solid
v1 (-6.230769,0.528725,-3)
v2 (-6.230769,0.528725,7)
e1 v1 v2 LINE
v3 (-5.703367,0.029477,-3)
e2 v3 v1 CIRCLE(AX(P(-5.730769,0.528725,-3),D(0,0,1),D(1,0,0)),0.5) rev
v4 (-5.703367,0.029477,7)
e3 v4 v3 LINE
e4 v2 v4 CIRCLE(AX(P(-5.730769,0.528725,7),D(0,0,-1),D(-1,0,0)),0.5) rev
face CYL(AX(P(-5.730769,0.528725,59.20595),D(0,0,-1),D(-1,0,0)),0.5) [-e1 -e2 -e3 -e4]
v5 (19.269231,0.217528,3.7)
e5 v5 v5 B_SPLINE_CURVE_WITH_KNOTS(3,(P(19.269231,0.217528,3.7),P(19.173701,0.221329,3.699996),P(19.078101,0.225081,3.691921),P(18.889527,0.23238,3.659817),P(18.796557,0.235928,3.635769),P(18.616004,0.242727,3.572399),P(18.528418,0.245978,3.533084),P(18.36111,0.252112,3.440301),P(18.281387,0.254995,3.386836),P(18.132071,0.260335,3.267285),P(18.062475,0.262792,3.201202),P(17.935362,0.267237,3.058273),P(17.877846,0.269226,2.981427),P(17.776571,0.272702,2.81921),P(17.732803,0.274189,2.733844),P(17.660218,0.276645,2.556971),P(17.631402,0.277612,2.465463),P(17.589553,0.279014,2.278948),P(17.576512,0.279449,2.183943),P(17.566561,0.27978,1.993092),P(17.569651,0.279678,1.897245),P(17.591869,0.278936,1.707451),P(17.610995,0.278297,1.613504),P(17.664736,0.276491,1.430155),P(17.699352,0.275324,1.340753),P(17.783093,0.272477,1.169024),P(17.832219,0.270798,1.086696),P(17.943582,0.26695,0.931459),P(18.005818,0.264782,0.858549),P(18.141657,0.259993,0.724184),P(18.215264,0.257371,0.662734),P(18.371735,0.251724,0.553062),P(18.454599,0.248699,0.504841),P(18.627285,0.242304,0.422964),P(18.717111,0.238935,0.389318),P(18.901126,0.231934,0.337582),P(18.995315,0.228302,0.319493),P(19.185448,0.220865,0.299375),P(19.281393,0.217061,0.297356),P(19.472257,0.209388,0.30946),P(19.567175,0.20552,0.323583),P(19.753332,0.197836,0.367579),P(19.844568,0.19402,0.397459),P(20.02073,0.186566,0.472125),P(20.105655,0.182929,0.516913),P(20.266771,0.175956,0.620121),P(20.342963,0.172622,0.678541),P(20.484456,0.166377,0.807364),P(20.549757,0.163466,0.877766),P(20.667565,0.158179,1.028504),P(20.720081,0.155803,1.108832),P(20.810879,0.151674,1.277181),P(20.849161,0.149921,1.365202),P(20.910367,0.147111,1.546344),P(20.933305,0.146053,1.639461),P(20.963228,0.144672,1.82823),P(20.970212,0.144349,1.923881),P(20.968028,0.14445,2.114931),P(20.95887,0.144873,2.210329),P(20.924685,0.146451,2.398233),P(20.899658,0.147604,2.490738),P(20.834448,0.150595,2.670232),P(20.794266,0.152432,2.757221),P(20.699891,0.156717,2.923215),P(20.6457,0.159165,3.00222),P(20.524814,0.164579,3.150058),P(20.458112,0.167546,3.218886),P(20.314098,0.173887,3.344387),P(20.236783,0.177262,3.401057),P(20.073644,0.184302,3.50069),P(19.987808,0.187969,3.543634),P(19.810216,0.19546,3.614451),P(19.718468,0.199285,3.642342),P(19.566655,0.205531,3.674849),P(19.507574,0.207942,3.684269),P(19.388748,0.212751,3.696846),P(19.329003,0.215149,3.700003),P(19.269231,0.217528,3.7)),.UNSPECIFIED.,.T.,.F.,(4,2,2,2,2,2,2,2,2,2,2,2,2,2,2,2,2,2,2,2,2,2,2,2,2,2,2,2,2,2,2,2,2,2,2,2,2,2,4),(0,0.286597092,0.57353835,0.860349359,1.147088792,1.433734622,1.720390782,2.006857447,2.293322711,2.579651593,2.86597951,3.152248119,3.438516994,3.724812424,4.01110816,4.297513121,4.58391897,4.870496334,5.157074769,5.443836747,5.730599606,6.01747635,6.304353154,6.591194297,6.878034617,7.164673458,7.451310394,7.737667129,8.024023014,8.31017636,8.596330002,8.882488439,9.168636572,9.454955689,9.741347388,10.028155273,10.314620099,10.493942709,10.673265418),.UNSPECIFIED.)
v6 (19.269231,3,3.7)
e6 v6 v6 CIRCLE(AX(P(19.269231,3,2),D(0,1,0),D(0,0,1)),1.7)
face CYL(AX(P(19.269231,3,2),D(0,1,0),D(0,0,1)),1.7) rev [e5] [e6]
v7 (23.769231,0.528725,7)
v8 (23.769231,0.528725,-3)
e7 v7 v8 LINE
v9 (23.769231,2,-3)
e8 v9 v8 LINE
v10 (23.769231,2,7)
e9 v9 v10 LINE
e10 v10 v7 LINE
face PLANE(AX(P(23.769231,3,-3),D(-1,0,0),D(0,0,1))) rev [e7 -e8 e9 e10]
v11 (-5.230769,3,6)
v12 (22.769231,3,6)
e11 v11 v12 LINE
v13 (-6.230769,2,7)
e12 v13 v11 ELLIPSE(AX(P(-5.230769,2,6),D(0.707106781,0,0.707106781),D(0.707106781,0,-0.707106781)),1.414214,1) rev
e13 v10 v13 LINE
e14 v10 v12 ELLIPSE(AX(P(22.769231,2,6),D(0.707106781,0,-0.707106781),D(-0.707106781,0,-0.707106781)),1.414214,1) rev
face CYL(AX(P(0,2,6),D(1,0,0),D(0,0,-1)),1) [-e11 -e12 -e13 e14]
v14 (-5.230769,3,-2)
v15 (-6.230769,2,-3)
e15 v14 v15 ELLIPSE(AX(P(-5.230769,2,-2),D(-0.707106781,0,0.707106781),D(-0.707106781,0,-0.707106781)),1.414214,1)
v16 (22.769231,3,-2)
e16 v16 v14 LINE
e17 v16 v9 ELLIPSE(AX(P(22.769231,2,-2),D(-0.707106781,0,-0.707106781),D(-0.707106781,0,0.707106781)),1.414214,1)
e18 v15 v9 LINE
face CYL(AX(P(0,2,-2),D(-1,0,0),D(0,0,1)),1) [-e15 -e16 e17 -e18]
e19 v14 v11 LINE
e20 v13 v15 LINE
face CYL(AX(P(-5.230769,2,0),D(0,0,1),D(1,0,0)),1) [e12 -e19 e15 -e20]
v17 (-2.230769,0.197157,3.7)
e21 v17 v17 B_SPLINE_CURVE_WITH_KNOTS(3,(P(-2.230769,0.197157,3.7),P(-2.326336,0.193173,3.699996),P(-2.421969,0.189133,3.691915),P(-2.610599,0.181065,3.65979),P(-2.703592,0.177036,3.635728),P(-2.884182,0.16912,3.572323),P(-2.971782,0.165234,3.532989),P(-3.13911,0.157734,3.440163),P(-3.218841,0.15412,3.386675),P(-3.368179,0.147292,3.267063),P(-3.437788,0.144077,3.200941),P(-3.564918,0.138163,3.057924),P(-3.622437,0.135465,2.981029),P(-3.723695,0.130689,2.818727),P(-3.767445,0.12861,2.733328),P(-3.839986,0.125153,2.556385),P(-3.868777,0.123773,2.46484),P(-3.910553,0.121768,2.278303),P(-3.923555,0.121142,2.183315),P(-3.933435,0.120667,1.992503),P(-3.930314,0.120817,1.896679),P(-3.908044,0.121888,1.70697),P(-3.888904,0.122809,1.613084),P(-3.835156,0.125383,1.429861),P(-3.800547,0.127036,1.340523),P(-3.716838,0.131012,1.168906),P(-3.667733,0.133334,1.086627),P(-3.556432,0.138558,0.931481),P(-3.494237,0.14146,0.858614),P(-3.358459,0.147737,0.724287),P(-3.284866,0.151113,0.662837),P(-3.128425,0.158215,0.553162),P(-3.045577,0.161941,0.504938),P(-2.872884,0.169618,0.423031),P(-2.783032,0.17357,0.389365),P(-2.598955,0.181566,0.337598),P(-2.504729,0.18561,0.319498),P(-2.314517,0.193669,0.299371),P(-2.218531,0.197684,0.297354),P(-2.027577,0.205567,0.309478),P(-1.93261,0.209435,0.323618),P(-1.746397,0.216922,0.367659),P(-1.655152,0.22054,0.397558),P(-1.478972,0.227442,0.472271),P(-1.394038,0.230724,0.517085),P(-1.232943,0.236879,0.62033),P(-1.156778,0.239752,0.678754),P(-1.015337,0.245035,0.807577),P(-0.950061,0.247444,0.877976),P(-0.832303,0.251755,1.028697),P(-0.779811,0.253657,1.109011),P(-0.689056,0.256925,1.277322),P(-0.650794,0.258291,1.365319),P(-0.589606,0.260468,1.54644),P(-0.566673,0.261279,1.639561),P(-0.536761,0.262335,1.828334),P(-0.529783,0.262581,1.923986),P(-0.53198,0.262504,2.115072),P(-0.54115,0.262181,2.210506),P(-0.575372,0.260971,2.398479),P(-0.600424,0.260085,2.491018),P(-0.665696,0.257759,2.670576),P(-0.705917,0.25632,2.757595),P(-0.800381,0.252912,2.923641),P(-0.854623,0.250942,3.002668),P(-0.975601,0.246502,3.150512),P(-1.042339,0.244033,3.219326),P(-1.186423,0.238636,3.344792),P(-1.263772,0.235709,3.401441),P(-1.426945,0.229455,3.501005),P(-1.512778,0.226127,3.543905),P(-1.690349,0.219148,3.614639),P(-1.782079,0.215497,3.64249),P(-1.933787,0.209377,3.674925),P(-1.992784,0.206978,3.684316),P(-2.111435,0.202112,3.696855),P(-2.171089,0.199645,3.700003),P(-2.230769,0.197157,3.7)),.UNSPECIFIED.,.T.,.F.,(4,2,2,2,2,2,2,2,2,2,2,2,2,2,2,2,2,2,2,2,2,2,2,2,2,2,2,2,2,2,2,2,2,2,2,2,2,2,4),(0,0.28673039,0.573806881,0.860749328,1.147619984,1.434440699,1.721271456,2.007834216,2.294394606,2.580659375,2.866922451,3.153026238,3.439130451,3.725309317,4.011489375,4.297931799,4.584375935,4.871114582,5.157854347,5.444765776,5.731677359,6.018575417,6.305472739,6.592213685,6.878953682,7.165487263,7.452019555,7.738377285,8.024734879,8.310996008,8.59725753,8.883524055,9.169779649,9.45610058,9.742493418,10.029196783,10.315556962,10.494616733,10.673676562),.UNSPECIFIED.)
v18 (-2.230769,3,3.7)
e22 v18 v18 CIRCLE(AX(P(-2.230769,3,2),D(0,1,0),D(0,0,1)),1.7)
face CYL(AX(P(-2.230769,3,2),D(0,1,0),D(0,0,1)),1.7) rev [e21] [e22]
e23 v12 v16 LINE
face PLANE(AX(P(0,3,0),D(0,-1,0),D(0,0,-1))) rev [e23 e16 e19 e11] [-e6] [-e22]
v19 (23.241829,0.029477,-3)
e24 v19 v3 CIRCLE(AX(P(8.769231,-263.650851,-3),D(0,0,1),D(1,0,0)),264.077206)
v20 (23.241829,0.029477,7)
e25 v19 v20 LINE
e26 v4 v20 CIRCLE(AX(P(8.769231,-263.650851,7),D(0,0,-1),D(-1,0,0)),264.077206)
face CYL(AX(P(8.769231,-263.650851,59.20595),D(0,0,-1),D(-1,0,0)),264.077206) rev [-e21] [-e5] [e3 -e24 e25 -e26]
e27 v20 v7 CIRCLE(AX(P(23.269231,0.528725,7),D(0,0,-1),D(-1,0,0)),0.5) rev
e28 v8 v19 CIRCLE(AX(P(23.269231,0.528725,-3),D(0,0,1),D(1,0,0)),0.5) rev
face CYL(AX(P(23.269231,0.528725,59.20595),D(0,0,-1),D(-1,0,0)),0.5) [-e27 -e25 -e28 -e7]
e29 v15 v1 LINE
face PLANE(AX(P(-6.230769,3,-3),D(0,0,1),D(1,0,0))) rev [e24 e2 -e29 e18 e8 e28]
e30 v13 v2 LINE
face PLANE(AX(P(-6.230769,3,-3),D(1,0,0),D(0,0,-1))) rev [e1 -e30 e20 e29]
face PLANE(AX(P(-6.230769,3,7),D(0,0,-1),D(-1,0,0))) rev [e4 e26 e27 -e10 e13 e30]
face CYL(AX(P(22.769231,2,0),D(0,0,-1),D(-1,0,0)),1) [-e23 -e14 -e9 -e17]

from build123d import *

# Parameters (mm, degrees)
SKETCH1_W            = 30
SKETCH1_H            = 10
BOSS_EXTRUDE1_DEPTH  = 3
M3_CLEARANCE_HOLE1_D = 3.4
FILLET3_R            = 1
CUT_EXTRUDE4_START   = -10
CUT_EXTRUDE4_DEPTH   = 10
FILLET4_R            = 0.5


# Read off the part's stored shape, not the designer's step: Cut-Extrude4
with BuildPart() as part:
    # Sketch1 → Boss-Extrude1 (new body)
    with BuildSketch(Plane(origin=(0, 0, 0), x_dir=(1, 0, 0), z_dir=(0, 1, 0))):
        with Locations((8.769230769, -2)):
            Rectangle(SKETCH1_W, SKETCH1_H)
    extrude(amount=BOSS_EXTRUDE1_DEPTH)

    # M3 Clearance Hole1 (through all)
    with Locations(Plane(origin=(0, 3, 0), x_dir=(1, 0, 0), z_dir=(0, 1, 0))):
        with Locations((-2.230769231, -2), (19.269230769, -2)):
            Hole(M3_CLEARANCE_HOLE1_D / 2)

    # Fillet3
    fillet3_edges = [part.edges().sort_by_distance(p)[0] for p in [
        (8.769230769, 3, 7),
        (23.769230769, 3, 2),
        (8.769230769, 3, -3),
        (-6.230769231, 3, 2),
    ]]
    fillet(fillet3_edges, radius=FILLET3_R)

    # Cut-Extrude4 outline → Cut-Extrude4 (cut)
    with BuildSketch(Plane.XY.offset(7).offset(CUT_EXTRUDE4_START)):
        with BuildLine():
            ThreePointArc((23.769230769, 0), (8.769230769, 0.426355955), (-6.230769231, 0))
            Line((-6.230769231, 0), (23.769230769, 0))
        make_face()
    extrude(amount=CUT_EXTRUDE4_DEPTH, mode=Mode.SUBTRACT)

    # Fillet4
    fillet4_edges = [part.edges().sort_by_distance(p)[0] for p in [
        (23.769230769, 0, 2),
        (-6.230769231, 0, 2),
    ]]
    fillet(fillet4_edges, radius=FILLET4_R)


solid = part.part
